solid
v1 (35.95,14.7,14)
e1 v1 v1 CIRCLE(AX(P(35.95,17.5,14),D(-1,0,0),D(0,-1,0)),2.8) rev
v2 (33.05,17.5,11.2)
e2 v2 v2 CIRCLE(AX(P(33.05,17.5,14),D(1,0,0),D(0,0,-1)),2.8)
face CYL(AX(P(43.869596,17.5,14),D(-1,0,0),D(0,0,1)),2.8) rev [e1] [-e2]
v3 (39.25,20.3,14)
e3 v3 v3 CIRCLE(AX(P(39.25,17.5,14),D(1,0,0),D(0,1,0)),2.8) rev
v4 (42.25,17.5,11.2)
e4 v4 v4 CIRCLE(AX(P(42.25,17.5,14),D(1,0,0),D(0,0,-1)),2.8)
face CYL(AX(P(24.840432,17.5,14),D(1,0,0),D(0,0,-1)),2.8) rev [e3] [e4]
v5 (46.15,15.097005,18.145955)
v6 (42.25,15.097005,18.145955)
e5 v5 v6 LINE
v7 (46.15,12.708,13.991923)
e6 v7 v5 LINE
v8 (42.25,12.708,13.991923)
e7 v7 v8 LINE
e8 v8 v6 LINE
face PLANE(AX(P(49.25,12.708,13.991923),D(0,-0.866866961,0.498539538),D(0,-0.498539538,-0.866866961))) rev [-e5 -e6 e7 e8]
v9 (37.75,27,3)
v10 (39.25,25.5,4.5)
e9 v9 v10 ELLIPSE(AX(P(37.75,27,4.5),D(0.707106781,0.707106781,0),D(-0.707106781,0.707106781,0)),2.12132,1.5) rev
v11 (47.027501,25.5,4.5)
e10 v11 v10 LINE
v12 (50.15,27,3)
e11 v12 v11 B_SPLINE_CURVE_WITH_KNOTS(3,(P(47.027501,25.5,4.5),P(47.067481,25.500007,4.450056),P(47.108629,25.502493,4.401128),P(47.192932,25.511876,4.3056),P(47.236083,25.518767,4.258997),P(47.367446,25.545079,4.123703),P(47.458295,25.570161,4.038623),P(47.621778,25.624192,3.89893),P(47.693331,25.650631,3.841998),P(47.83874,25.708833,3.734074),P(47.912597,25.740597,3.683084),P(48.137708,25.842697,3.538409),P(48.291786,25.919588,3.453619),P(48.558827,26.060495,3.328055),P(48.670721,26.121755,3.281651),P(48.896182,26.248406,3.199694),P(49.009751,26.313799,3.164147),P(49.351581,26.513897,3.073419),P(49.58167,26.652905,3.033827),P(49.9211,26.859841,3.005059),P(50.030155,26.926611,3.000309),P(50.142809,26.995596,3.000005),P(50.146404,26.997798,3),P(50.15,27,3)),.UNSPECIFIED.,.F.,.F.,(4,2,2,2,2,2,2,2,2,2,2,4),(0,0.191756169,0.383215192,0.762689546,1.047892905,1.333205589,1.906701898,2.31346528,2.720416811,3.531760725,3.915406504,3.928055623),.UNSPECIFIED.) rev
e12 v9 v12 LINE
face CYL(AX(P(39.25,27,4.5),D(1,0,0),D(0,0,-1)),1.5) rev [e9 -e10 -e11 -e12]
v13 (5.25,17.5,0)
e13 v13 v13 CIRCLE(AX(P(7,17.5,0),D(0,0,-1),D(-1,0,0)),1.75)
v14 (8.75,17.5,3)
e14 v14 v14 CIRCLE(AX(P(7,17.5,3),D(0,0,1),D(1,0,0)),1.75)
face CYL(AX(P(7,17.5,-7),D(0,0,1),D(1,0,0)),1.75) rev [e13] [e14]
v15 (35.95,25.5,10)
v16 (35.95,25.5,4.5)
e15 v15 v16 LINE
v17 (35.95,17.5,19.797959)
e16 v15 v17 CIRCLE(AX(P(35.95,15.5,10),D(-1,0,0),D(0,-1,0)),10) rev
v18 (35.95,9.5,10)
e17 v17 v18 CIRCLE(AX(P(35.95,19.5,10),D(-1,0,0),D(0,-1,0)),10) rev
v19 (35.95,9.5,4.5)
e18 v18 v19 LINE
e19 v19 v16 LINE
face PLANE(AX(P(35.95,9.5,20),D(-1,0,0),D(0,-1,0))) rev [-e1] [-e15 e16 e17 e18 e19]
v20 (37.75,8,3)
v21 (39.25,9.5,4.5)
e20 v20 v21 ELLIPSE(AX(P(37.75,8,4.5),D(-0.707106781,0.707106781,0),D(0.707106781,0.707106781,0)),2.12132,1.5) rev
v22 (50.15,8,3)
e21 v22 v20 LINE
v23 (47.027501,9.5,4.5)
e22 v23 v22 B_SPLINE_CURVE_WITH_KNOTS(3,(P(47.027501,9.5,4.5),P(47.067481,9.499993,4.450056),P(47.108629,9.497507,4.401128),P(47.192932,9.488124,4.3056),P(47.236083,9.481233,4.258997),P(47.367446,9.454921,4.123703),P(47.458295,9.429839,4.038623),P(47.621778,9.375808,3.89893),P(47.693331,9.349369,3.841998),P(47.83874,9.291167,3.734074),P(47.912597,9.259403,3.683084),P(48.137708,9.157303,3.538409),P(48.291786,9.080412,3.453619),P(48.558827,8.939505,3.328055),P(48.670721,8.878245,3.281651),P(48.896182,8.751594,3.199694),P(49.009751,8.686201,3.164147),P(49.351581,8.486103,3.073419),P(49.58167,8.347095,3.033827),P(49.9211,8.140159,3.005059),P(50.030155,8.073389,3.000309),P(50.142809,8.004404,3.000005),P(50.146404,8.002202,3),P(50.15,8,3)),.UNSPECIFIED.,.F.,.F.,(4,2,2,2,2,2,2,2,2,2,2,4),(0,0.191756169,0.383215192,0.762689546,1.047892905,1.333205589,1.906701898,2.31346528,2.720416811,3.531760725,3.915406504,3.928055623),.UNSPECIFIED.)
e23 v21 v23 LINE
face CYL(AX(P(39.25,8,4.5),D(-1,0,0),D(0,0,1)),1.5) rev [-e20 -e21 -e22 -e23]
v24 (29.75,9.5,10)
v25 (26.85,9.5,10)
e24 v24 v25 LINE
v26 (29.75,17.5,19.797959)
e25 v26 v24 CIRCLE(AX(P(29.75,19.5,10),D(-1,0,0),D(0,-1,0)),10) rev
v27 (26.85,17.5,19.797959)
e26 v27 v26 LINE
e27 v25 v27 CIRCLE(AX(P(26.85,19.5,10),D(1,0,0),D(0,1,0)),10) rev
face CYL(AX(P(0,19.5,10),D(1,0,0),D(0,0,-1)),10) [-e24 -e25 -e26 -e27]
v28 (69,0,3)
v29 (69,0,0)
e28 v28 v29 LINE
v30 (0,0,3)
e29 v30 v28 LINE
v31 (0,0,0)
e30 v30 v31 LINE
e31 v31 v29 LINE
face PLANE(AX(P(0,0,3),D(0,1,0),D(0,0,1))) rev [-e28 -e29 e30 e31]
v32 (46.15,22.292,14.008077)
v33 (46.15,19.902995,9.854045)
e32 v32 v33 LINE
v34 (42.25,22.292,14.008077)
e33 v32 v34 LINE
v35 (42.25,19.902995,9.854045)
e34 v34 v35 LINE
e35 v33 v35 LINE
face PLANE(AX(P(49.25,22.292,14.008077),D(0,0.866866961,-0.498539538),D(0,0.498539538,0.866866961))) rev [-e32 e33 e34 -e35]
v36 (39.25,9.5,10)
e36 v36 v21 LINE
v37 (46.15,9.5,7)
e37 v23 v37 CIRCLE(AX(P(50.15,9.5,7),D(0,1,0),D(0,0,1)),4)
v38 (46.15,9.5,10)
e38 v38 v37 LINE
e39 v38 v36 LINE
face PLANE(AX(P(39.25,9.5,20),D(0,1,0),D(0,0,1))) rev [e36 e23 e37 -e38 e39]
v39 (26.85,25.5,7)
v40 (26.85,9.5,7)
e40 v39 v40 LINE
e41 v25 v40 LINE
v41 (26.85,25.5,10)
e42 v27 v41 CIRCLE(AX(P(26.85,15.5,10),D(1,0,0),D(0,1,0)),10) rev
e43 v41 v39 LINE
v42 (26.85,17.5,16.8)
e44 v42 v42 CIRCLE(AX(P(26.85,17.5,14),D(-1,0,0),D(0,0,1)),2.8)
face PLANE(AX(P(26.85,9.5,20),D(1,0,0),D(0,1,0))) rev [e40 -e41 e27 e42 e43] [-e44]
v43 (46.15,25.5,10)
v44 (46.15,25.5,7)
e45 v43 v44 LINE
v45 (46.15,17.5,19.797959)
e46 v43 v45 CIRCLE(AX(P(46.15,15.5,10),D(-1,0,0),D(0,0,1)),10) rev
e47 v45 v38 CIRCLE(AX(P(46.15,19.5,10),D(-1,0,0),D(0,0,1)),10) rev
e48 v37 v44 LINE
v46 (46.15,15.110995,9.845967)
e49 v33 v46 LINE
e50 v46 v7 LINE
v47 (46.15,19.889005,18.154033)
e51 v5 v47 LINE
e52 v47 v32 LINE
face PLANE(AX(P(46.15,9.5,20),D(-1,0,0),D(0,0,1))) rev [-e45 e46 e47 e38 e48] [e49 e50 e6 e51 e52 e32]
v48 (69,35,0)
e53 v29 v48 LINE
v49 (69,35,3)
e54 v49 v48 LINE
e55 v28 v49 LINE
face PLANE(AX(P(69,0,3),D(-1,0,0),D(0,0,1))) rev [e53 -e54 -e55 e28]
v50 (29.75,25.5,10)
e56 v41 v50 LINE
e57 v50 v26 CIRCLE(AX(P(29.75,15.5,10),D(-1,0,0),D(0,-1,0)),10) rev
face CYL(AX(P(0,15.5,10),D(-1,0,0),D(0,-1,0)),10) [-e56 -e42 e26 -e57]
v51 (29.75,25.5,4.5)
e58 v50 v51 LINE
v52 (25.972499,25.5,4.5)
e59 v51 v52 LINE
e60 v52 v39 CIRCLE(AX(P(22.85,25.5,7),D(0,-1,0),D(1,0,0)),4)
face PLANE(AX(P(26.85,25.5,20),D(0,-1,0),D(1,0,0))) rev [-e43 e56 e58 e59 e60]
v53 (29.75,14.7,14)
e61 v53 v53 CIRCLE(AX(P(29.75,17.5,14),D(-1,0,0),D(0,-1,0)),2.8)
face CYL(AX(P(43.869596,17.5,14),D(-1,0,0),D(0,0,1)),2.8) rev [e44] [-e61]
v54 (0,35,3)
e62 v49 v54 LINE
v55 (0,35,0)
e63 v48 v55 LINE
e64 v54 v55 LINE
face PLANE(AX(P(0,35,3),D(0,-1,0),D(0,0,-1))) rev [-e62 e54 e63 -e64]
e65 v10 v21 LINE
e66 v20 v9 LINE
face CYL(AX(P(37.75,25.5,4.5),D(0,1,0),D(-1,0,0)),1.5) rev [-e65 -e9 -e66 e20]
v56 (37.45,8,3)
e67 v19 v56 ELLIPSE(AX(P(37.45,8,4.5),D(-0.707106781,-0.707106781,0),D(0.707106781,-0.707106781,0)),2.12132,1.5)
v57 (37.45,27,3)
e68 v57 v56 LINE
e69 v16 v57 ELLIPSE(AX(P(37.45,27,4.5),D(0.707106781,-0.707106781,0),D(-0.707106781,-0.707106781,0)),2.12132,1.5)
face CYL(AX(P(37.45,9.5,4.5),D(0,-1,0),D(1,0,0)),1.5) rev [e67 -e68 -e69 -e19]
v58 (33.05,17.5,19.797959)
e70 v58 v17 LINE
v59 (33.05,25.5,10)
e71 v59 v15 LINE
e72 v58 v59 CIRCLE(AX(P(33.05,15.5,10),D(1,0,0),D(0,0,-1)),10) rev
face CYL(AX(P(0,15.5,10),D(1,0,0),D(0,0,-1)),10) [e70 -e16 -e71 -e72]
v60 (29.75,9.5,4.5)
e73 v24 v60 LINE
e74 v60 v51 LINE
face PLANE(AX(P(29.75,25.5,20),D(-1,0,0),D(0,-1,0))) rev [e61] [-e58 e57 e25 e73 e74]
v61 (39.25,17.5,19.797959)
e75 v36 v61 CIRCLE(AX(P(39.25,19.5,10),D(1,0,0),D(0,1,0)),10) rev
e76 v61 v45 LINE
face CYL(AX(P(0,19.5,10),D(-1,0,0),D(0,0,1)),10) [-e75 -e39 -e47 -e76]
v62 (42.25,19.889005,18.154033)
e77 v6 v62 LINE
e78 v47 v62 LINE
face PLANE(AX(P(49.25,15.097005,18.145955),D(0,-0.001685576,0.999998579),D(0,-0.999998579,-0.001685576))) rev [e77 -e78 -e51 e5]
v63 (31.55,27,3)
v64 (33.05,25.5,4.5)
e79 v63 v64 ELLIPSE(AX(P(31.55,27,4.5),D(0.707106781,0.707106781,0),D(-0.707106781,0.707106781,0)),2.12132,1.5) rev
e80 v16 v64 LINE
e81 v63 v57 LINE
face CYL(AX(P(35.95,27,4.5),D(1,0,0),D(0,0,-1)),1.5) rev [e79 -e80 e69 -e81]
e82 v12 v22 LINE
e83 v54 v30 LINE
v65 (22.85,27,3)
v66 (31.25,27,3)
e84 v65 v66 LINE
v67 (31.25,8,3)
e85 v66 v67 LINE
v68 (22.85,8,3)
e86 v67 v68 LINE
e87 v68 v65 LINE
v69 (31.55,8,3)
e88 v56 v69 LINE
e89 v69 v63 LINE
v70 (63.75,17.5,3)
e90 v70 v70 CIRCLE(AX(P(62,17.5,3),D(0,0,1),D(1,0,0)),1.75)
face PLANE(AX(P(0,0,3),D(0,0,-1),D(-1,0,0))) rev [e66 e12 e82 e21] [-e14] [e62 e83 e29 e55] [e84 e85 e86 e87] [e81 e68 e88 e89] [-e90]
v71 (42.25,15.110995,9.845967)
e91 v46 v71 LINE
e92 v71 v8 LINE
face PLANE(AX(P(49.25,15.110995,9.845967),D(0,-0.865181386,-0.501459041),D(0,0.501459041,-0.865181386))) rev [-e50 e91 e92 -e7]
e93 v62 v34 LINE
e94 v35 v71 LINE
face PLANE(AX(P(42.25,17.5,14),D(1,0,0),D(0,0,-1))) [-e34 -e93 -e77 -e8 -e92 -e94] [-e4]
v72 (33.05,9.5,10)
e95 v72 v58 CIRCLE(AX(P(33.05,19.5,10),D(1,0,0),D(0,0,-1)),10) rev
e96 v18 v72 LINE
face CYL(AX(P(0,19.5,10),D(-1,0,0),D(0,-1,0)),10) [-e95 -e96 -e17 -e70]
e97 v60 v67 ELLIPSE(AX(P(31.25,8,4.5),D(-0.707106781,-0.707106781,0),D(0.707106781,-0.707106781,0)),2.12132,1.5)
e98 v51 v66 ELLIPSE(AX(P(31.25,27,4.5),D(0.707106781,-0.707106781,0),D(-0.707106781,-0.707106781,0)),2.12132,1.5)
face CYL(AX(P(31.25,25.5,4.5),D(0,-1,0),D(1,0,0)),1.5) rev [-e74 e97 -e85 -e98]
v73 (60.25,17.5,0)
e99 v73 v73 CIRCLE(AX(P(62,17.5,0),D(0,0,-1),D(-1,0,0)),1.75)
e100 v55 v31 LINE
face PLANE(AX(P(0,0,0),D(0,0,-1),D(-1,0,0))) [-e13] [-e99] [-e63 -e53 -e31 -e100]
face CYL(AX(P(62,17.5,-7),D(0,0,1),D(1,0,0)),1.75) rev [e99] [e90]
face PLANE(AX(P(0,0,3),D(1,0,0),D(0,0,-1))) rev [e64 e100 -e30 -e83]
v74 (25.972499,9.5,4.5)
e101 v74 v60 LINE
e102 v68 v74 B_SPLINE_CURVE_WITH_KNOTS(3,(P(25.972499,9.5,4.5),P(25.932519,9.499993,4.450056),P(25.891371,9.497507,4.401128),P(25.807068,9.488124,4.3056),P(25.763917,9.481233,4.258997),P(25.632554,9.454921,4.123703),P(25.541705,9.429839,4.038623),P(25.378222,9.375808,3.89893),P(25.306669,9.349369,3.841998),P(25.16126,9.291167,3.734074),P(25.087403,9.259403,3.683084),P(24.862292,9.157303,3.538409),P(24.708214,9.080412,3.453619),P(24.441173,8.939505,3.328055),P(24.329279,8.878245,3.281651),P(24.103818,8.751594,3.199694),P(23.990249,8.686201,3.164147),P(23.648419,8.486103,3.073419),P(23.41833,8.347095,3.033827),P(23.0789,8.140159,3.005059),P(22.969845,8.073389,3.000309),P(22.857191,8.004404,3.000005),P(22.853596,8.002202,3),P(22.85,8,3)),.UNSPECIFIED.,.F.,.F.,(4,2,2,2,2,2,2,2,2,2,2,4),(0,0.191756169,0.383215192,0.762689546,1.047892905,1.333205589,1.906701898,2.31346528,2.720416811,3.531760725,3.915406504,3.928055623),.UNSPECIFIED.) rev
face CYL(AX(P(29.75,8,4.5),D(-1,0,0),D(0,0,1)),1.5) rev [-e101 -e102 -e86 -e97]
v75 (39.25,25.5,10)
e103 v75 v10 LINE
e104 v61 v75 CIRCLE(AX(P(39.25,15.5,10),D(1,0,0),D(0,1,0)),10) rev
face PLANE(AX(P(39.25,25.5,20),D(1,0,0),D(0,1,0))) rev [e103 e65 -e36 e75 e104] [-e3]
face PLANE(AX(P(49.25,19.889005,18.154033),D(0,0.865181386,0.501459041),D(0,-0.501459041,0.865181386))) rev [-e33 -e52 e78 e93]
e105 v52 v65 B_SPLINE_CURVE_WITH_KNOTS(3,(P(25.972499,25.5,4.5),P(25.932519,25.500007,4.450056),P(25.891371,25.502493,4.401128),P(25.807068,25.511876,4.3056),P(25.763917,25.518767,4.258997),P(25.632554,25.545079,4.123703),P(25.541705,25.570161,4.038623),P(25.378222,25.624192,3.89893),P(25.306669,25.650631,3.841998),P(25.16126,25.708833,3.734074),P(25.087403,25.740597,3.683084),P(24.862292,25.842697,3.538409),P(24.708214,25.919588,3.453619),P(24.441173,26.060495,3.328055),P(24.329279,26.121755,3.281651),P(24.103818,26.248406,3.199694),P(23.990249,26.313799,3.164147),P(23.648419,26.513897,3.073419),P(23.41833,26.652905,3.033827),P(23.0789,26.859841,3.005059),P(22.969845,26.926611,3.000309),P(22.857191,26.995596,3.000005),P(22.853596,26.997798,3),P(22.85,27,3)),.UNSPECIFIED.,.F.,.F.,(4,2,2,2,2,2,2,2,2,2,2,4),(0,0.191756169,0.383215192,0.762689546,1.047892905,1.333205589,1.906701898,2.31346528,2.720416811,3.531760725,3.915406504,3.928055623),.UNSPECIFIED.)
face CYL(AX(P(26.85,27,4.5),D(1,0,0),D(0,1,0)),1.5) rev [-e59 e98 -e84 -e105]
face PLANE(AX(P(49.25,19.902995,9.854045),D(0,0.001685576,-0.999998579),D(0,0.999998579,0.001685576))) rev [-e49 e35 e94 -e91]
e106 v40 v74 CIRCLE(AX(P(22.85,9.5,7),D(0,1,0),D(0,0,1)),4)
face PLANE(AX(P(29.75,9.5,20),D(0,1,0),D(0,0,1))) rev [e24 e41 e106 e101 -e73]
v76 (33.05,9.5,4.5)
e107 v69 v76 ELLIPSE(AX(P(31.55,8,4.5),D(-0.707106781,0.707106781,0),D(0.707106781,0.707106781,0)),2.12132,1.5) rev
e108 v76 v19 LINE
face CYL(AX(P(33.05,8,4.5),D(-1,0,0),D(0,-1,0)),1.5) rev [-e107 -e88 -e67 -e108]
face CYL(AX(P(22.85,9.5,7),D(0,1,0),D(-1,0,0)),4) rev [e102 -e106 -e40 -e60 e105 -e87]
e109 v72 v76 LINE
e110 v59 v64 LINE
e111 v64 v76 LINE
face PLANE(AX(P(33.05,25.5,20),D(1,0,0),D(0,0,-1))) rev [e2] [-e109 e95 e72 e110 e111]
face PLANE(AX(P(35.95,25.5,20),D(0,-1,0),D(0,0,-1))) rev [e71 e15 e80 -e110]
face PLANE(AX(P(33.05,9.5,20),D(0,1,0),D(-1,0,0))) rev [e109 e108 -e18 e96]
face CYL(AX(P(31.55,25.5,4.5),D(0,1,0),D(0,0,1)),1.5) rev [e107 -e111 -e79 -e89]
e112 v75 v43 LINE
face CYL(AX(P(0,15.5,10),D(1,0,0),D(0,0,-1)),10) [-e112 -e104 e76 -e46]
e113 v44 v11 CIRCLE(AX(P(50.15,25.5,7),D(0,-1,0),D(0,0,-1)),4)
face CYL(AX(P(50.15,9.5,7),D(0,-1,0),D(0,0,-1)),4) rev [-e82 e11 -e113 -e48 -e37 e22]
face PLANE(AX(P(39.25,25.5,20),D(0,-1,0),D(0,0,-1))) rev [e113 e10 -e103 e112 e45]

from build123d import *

# Parameters (mm, degrees)
SKETCH_1_W          = 69
SKETCH_1_H          = 35
EXTRUDE_1_DEPTH     = 3
SKETCH_2_W          = 2.9
SKETCH_2_H          = 16
SKETCH_2_W_2        = 6.9
EXTRUDE_2_DEPTH     = 17
CUT_EXTRUDE_1_REACH = 60.323
SKETCH_3_R          = 2.8
FILLET_1_R          = 10
FILLET_2_R          = 4
CUT_EXTRUDE_2_DEPTH = 10
FILLET_3_R          = 1.5
EXTRUDE_START       = -6.9
SKETCH_6_R          = 5.094551448
SKETCH_6_R_2        = 2.8
EXTRUDE_4_DEPTH     = 3
SKETCH_7_R          = 1.75
CUT_EXTRUDE_3_DEPTH = 10


with BuildPart() as part:
    # Эскиз1 → Бобышка-Вытянуть1 (new body)
    with BuildSketch(Plane.XY):
        with Locations((34.5, 17.5)):
            Rectangle(SKETCH_1_W, SKETCH_1_H)
    extrude(amount=EXTRUDE_1_DEPTH)

    # Эскиз2 → Бобышка-Вытянуть2 (add)
    with BuildSketch(Plane.XY.offset(3)):
        with Locations((34.5, 17.5)):
            Rectangle(SKETCH_2_W, SKETCH_2_H)
        with Locations((28.3, 17.5)):
            Rectangle(SKETCH_2_W, SKETCH_2_H)
        with Locations((42.7, 17.5)):
            Rectangle(SKETCH_2_W_2, SKETCH_2_H)
    extrude(amount=EXTRUDE_2_DEPTH)

    # Вырез-Вытянуть1: up to this face of the body (flat: up to its plane)
    cut_extrude_1_end = Plane(part.part.faces().sort_by_distance((35.95, 17.5, 11.5))[0])
    # Эскиз3 → Вырез-Вытянуть1 (cut, up to the picked face)
    with BuildSketch(Plane.ZY.offset(-26.85), mode=Mode.PRIVATE) as cut_extrude_1_sk1:
        with Locations((14, 17.5)):
            Circle(SKETCH_3_R)
    cut_extrude_1_tool1 = split(extrude(cut_extrude_1_sk1.sketch, amount=-CUT_EXTRUDE_1_REACH, mode=Mode.PRIVATE), bisect_by=cut_extrude_1_end, keep=Keep.BOTH, mode=Mode.PRIVATE)
    add(cut_extrude_1_tool1.solids().sort_by(Axis((26.85, 17.5, 14), (1, 0, 0)))[0], mode=Mode.SUBTRACT)

    # Скругление1
    # the kernel refuses this fillet: 10 mm, written as the material it takes off along each edge
    with BuildSketch(Plane(origin=(1.85, 25.5, 20), x_dir=(0, 0, -1), z_dir=(1, 0, 0)), Plane(origin=(54.75, 9.5, 20), x_dir=(0, 0, -1), z_dir=(-1, 0, 0))) as fillet_1_piece_1:
        with BuildLine():
            CenterArc((FILLET_1_R, -FILLET_1_R), FILLET_1_R, 90, 90)
            Line((0, -FILLET_1_R), (0, 0))
            Line((0, 0), (FILLET_1_R, 0))
        make_face()
    extrude(amount=52.9, mode=Mode.SUBTRACT)
    with BuildSketch(Plane(origin=(60.95, 25.5, 20), x_dir=(0, 0, -1), z_dir=(-1, 0, 0)), Plane(origin=(8.05, 9.5, 20), x_dir=(0, 0, -1), z_dir=(1, 0, 0))) as fillet_1_piece_2:
        with BuildLine():
            CenterArc((FILLET_1_R, FILLET_1_R), FILLET_1_R, 180, 90)
            Line((0, FILLET_1_R), (0, 0))
            Line((0, 0), (FILLET_1_R, 0))
        make_face()
    extrude(amount=52.9, mode=Mode.SUBTRACT)
    with BuildSketch(Plane(origin=(14.25, 25.5, 20), x_dir=(0, 0, -1), z_dir=(1, 0, 0)), Plane(origin=(71.15, 9.5, 20), x_dir=(0, 0, -1), z_dir=(-1, 0, 0))) as fillet_1_piece_3:
        with BuildLine():
            CenterArc((FILLET_1_R, -FILLET_1_R), FILLET_1_R, 90, 90)
            Line((0, -FILLET_1_R), (0, 0))
            Line((0, 0), (FILLET_1_R, 0))
        make_face()
    extrude(amount=56.9, mode=Mode.SUBTRACT)

    # Скругление2
    fillet_2_edges = [part.edges().sort_by_distance(p)[0] for p in [
        (46.15, 17.5, 3),
        (26.85, 17.5, 3),
    ]]
    fillet(fillet_2_edges, radius=FILLET_2_R)

    # Эскиз4 → Вырез-Вытянуть2 (cut)
    with BuildSketch(Plane.ZY.offset(-39.25)):
        Polygon((14.008077291, 22.292000427), (9.854044541, 19.902995352), (9.84596725, 15.110994925), (13.991922709, 12.707999573), (18.145955459, 15.097004648), (18.15403275, 19.889005075), align=None)
    extrude(amount=-CUT_EXTRUDE_2_DEPTH, mode=Mode.SUBTRACT)

    # Скругление3
    fillet_3_edges = [part.edges().sort_by_distance(p)[0] for p in [
        (34.5, 25.5, 3),
        (33.05, 17.5, 3),
        (34.5, 9.5, 3),
        (35.95, 17.5, 3),
        (39.25, 17.5, 3),
        (44.7, 9.5, 3),
        (44.7, 25.5, 3),
        (29.75, 17.5, 3),
        (26.3, 25.5, 3),
        (26.3, 9.5, 3),
    ]]
    fillet(fillet_3_edges, radius=FILLET_3_R)

    # Эскиз6 → Бобышка-Вытянуть4 (add)
    with BuildSketch(Plane(origin=(46.15, 0, 0), x_dir=(0, 0, -1), z_dir=(1, 0, 0)).offset(EXTRUDE_START)):
        with Locations((-14, 17.5)):
            Circle(SKETCH_6_R)
        with Locations(Location((-14, 17.5, 0), (0, 0, 180))):
            Circle(SKETCH_6_R_2, mode=Mode.SUBTRACT)
    extrude(amount=EXTRUDE_4_DEPTH)

    # Эскиз7 → Вырез-Вытянуть3 (cut)
    with BuildSketch(Plane.XY.offset(3)):
        with Locations((7, 17.5)):
            Circle(SKETCH_7_R)
        with Locations((62, 17.5)):
            Circle(SKETCH_7_R)
    extrude(amount=-CUT_EXTRUDE_3_DEPTH, mode=Mode.SUBTRACT)


solid = part.part
